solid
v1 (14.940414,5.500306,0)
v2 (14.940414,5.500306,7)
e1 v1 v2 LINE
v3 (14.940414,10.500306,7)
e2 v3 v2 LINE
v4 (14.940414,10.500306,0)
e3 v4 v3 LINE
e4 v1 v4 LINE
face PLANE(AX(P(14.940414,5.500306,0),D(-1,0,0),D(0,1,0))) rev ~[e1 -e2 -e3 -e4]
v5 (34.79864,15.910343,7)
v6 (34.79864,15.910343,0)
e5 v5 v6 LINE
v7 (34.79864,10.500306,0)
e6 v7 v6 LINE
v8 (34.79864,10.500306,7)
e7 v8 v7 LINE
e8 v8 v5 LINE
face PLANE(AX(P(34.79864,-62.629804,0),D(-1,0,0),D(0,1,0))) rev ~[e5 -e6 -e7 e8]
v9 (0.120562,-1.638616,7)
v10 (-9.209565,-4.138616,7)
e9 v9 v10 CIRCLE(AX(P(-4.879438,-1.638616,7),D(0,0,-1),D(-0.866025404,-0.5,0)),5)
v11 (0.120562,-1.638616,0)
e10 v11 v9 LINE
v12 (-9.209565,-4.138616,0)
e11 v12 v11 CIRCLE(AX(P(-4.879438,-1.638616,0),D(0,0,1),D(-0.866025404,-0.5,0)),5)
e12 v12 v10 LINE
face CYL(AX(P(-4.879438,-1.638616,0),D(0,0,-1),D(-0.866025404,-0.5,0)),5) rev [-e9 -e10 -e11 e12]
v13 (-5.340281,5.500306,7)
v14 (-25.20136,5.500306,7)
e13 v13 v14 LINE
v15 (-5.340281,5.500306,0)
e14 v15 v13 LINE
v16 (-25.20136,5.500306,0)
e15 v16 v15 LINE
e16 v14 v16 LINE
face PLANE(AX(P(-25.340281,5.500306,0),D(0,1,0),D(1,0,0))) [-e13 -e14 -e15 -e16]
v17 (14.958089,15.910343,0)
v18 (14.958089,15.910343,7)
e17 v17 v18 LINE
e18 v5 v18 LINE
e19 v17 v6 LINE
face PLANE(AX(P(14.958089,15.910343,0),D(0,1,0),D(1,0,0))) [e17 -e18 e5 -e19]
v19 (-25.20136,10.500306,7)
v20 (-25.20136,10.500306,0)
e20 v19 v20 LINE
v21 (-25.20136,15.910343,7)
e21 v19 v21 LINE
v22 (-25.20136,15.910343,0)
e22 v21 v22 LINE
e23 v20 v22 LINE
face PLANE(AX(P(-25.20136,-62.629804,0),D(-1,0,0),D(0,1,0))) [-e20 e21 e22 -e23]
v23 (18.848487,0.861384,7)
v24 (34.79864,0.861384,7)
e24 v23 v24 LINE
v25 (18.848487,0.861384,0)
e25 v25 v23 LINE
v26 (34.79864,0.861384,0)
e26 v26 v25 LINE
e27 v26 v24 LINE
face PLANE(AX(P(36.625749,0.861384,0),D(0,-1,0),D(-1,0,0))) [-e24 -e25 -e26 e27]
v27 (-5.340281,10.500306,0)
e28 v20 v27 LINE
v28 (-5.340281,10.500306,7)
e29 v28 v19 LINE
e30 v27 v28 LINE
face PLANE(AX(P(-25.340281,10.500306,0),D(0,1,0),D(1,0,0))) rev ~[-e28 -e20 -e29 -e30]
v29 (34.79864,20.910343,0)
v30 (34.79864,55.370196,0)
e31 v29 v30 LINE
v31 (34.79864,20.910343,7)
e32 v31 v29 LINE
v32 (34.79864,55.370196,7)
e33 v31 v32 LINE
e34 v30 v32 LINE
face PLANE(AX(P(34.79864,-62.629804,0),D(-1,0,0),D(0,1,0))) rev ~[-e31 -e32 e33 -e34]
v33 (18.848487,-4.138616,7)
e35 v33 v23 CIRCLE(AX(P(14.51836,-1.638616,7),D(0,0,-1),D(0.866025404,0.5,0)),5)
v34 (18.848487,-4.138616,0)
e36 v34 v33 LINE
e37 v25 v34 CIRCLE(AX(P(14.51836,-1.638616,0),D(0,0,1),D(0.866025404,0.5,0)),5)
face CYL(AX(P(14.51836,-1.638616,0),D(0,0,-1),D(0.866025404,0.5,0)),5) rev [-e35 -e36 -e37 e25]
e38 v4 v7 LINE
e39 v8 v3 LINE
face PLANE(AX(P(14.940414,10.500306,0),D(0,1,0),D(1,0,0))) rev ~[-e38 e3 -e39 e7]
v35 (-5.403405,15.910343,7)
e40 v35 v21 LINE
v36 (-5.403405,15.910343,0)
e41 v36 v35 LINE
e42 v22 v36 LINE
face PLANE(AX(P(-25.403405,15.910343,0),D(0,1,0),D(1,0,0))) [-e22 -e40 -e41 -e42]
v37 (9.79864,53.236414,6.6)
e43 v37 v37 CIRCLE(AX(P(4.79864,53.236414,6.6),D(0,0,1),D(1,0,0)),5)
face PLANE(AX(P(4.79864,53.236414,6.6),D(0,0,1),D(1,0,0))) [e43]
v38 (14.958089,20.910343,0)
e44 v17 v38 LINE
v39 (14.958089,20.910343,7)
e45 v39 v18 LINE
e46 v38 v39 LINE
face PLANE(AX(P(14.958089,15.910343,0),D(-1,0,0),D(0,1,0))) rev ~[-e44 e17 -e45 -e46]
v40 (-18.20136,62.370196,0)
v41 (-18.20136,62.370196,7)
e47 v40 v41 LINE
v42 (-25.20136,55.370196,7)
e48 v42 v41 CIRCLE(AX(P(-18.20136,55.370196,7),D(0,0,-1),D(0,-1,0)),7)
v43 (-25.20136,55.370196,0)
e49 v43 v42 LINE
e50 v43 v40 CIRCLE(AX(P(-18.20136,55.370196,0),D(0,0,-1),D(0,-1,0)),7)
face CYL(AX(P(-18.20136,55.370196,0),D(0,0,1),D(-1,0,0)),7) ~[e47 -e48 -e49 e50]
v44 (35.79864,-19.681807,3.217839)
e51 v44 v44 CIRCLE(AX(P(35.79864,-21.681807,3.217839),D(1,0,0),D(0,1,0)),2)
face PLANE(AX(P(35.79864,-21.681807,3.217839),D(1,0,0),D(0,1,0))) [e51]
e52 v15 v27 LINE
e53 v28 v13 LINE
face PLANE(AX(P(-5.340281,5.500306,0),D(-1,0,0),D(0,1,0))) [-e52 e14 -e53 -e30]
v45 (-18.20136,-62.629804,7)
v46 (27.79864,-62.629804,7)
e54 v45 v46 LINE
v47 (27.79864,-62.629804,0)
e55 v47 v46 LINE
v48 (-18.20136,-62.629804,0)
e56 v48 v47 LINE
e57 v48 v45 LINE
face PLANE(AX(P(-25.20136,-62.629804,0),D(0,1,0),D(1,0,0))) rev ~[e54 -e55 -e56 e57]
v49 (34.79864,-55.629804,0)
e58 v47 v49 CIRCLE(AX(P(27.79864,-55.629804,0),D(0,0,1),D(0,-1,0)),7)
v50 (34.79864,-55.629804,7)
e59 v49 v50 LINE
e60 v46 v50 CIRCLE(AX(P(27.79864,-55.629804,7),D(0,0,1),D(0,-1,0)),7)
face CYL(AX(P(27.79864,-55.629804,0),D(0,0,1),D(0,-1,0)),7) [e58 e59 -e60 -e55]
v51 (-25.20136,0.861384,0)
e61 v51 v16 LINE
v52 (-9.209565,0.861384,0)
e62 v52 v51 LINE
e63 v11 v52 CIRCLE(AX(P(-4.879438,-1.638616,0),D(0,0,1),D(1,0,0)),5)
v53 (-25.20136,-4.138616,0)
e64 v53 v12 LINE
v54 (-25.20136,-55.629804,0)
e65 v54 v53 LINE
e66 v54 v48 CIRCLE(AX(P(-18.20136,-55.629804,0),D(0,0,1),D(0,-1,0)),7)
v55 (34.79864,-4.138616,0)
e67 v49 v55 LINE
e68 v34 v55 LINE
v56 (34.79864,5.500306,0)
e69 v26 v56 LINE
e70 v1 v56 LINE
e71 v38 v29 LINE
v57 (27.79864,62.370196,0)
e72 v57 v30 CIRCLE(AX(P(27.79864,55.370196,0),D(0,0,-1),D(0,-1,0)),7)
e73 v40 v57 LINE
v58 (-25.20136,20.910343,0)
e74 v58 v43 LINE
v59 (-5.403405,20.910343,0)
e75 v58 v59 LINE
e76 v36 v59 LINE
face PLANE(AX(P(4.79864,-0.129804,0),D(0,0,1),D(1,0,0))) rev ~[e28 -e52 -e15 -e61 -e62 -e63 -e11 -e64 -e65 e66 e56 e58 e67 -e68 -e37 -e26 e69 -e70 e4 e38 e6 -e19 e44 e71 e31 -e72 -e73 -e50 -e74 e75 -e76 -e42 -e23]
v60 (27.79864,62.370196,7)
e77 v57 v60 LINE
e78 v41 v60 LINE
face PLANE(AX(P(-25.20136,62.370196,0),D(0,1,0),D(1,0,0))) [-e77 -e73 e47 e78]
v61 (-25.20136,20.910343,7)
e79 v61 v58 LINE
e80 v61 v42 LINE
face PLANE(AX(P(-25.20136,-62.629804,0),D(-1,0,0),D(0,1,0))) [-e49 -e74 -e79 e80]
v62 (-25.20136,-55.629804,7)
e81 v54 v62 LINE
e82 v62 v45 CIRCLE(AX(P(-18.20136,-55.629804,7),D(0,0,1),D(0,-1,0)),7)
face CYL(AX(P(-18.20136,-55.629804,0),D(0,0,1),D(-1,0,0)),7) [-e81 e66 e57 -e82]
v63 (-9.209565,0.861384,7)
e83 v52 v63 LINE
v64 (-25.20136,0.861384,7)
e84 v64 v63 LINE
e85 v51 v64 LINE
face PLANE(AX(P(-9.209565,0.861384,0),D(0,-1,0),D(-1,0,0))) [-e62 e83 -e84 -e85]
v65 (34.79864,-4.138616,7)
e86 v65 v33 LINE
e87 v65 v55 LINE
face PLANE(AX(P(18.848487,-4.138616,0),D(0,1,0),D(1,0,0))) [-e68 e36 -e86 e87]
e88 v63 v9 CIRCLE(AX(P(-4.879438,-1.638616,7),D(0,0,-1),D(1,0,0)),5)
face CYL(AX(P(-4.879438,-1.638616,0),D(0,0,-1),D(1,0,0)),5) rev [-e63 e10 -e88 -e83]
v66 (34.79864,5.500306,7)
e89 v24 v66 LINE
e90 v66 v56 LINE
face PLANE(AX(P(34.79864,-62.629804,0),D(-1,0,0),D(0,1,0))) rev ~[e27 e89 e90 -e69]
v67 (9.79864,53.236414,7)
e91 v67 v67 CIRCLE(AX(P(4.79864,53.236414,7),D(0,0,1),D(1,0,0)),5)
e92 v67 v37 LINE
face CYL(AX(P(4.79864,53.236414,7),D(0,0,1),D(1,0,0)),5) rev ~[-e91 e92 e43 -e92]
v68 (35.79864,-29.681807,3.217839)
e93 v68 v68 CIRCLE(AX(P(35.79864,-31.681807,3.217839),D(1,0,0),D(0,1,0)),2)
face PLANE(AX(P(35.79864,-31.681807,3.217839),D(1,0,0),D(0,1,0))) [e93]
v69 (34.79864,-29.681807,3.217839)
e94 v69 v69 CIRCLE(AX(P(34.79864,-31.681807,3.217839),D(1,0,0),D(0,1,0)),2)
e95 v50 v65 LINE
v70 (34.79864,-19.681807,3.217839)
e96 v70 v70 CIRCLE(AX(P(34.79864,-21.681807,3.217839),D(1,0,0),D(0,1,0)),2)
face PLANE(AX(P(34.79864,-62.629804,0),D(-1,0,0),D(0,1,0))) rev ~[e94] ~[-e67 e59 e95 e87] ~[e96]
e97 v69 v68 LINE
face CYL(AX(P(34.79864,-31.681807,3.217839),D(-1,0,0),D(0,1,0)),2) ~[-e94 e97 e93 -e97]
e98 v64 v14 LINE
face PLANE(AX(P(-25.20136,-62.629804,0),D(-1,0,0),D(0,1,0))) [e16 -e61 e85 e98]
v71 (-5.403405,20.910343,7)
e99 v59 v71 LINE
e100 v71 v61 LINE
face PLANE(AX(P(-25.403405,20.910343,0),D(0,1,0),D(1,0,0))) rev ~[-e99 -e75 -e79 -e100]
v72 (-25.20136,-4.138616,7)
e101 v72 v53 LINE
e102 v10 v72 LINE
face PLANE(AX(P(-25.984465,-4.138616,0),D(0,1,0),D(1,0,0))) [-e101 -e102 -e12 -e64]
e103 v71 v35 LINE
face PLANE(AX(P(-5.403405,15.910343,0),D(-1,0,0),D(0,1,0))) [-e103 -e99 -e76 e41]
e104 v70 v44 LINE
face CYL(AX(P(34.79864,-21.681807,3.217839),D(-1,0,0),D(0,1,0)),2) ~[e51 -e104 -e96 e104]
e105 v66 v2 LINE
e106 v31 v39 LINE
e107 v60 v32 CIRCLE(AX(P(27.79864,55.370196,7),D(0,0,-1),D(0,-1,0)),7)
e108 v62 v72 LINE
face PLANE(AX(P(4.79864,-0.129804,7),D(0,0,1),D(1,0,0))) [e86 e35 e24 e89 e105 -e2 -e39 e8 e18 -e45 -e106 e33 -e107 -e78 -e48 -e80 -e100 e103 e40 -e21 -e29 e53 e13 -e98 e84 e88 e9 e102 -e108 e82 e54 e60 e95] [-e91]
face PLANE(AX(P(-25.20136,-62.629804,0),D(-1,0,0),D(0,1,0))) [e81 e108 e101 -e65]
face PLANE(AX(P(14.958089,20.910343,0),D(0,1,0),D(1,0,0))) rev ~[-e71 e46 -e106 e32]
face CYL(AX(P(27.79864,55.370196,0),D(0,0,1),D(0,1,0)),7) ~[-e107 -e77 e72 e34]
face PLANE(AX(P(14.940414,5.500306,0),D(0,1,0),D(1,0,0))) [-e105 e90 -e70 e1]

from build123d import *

# Parameters (mm, degrees)
F0_W      = 60
F0_H      = 125
F1_DEPTH  = 7
F2_R      = 7
F3_R      = 7
F4_R      = 7
F5_R      = 2
F6_DEPTH  = 1
F9_W      = 20
F9_H      = 5
F10_DEPTH = 88.1
F7_R      = 5
F12_DEPTH = 0.4


# Not quite as in the source:
# - the program builds the solid bodies; features that only make, move or delete a surface that nothing else refers to are left out


with BuildPart() as f1:
    # F0 (on Top) → F1 (new body)
    with BuildSketch(Plane.XY):
        with Locations((4.798640497, -0.129804003)):
            Rectangle(F0_W, F0_H)
    extrude(amount=F1_DEPTH)

    # F2
    f2_edges = [f1.edges().sort_by_distance(p)[0] for p in [
        (-25.20136, -62.629804, 3.5),
    ]]
    fillet(f2_edges, radius=F2_R)

    # F3
    f3_edges = [f1.edges().sort_by_distance(p)[0] for p in [
        (-25.20136, 62.370196, 3.5),
        (34.79864, -62.629804, 3.5),
    ]]
    fillet(f3_edges, radius=F3_R)

    # F4
    f4_edges = [f1.edges().sort_by_distance(p)[0] for p in [
        (34.79864, 62.370196, 3.5),
    ]]
    fillet(f4_edges, radius=F4_R)

    # F5 (on face) → F6 (join)
    with BuildSketch(Plane.YZ.offset(34.798640497)):
        with Locations((-31.6818073764, 3.2178394031)):
            Circle(F5_R)
        with Locations((-21.6818073764, 3.2178394031)):
            Circle(F5_R)
    extrude(amount=F6_DEPTH)

    # F9 (on Top) → F10 (cut)
    with BuildSketch(Plane.XY):
        with Locations((-15.4034045642, 18.4103432111)):
            Rectangle(F9_W, F9_H)
        with Locations((24.9580888633, 18.4103432111)):
            Rectangle(F9_W, F9_H)
        with Locations((-15.3402814512, 8.0003063194)):
            Rectangle(F9_W, F9_H)
        with Locations((24.940414155, 8.0003063194)):
            Rectangle(F9_W, F9_H)
        with BuildLine():
            Line((-9.2095649145, 0.8613835648), (-25.9844651689, 0.8613835648))
            Line((-25.9844651689, 0.8613835648), (-25.9844651689, -4.1386164352))
            Line((-25.9844651689, -4.1386164352), (-9.2095649145, -4.1386164352))
            ThreePointArc((-9.2095649145, -4.1386164352), (-9.8794378956, -1.6386164352), (-9.2095649145, 0.8613835648))
        make_face()
        with BuildLine():
            ThreePointArc((0.1205621044, -1.6386164352), (-3.5853426701, 3.1910126962), (-9.2095649145, 0.8613835648))
            ThreePointArc((-9.2095649145, 0.8613835648), (-9.8794378956, -1.6386164352), (-9.2095649145, -4.1386164352))
            ThreePointArc((-9.2095649145, -4.1386164352), (-3.5853426701, -6.4682455667), (0.1205621044, -1.6386164352))
        make_face()
        with BuildLine():
            Line((36.6257494559, -4.1386164352), (36.6257494559, 0.8613835648))
            Line((36.6257494559, 0.8613835648), (18.8484872035, 0.8613835648))
            ThreePointArc((18.8484872035, 0.8613835648), (9.5183601846, -1.6386164352), (18.8484872035, -4.1386164352))
            Line((18.8484872035, -4.1386164352), (36.6257494559, -4.1386164352))
        make_face()
    extrude(amount=F10_DEPTH, mode=Mode.SUBTRACT)

    # F7 (on face) → F12 (cut)
    with BuildSketch(Plane.XY.offset(7)):
        with Locations((4.798640497, 53.2364137471)):
            Circle(F7_R)
    extrude(amount=-F12_DEPTH, mode=Mode.SUBTRACT)


solid = f1.part
